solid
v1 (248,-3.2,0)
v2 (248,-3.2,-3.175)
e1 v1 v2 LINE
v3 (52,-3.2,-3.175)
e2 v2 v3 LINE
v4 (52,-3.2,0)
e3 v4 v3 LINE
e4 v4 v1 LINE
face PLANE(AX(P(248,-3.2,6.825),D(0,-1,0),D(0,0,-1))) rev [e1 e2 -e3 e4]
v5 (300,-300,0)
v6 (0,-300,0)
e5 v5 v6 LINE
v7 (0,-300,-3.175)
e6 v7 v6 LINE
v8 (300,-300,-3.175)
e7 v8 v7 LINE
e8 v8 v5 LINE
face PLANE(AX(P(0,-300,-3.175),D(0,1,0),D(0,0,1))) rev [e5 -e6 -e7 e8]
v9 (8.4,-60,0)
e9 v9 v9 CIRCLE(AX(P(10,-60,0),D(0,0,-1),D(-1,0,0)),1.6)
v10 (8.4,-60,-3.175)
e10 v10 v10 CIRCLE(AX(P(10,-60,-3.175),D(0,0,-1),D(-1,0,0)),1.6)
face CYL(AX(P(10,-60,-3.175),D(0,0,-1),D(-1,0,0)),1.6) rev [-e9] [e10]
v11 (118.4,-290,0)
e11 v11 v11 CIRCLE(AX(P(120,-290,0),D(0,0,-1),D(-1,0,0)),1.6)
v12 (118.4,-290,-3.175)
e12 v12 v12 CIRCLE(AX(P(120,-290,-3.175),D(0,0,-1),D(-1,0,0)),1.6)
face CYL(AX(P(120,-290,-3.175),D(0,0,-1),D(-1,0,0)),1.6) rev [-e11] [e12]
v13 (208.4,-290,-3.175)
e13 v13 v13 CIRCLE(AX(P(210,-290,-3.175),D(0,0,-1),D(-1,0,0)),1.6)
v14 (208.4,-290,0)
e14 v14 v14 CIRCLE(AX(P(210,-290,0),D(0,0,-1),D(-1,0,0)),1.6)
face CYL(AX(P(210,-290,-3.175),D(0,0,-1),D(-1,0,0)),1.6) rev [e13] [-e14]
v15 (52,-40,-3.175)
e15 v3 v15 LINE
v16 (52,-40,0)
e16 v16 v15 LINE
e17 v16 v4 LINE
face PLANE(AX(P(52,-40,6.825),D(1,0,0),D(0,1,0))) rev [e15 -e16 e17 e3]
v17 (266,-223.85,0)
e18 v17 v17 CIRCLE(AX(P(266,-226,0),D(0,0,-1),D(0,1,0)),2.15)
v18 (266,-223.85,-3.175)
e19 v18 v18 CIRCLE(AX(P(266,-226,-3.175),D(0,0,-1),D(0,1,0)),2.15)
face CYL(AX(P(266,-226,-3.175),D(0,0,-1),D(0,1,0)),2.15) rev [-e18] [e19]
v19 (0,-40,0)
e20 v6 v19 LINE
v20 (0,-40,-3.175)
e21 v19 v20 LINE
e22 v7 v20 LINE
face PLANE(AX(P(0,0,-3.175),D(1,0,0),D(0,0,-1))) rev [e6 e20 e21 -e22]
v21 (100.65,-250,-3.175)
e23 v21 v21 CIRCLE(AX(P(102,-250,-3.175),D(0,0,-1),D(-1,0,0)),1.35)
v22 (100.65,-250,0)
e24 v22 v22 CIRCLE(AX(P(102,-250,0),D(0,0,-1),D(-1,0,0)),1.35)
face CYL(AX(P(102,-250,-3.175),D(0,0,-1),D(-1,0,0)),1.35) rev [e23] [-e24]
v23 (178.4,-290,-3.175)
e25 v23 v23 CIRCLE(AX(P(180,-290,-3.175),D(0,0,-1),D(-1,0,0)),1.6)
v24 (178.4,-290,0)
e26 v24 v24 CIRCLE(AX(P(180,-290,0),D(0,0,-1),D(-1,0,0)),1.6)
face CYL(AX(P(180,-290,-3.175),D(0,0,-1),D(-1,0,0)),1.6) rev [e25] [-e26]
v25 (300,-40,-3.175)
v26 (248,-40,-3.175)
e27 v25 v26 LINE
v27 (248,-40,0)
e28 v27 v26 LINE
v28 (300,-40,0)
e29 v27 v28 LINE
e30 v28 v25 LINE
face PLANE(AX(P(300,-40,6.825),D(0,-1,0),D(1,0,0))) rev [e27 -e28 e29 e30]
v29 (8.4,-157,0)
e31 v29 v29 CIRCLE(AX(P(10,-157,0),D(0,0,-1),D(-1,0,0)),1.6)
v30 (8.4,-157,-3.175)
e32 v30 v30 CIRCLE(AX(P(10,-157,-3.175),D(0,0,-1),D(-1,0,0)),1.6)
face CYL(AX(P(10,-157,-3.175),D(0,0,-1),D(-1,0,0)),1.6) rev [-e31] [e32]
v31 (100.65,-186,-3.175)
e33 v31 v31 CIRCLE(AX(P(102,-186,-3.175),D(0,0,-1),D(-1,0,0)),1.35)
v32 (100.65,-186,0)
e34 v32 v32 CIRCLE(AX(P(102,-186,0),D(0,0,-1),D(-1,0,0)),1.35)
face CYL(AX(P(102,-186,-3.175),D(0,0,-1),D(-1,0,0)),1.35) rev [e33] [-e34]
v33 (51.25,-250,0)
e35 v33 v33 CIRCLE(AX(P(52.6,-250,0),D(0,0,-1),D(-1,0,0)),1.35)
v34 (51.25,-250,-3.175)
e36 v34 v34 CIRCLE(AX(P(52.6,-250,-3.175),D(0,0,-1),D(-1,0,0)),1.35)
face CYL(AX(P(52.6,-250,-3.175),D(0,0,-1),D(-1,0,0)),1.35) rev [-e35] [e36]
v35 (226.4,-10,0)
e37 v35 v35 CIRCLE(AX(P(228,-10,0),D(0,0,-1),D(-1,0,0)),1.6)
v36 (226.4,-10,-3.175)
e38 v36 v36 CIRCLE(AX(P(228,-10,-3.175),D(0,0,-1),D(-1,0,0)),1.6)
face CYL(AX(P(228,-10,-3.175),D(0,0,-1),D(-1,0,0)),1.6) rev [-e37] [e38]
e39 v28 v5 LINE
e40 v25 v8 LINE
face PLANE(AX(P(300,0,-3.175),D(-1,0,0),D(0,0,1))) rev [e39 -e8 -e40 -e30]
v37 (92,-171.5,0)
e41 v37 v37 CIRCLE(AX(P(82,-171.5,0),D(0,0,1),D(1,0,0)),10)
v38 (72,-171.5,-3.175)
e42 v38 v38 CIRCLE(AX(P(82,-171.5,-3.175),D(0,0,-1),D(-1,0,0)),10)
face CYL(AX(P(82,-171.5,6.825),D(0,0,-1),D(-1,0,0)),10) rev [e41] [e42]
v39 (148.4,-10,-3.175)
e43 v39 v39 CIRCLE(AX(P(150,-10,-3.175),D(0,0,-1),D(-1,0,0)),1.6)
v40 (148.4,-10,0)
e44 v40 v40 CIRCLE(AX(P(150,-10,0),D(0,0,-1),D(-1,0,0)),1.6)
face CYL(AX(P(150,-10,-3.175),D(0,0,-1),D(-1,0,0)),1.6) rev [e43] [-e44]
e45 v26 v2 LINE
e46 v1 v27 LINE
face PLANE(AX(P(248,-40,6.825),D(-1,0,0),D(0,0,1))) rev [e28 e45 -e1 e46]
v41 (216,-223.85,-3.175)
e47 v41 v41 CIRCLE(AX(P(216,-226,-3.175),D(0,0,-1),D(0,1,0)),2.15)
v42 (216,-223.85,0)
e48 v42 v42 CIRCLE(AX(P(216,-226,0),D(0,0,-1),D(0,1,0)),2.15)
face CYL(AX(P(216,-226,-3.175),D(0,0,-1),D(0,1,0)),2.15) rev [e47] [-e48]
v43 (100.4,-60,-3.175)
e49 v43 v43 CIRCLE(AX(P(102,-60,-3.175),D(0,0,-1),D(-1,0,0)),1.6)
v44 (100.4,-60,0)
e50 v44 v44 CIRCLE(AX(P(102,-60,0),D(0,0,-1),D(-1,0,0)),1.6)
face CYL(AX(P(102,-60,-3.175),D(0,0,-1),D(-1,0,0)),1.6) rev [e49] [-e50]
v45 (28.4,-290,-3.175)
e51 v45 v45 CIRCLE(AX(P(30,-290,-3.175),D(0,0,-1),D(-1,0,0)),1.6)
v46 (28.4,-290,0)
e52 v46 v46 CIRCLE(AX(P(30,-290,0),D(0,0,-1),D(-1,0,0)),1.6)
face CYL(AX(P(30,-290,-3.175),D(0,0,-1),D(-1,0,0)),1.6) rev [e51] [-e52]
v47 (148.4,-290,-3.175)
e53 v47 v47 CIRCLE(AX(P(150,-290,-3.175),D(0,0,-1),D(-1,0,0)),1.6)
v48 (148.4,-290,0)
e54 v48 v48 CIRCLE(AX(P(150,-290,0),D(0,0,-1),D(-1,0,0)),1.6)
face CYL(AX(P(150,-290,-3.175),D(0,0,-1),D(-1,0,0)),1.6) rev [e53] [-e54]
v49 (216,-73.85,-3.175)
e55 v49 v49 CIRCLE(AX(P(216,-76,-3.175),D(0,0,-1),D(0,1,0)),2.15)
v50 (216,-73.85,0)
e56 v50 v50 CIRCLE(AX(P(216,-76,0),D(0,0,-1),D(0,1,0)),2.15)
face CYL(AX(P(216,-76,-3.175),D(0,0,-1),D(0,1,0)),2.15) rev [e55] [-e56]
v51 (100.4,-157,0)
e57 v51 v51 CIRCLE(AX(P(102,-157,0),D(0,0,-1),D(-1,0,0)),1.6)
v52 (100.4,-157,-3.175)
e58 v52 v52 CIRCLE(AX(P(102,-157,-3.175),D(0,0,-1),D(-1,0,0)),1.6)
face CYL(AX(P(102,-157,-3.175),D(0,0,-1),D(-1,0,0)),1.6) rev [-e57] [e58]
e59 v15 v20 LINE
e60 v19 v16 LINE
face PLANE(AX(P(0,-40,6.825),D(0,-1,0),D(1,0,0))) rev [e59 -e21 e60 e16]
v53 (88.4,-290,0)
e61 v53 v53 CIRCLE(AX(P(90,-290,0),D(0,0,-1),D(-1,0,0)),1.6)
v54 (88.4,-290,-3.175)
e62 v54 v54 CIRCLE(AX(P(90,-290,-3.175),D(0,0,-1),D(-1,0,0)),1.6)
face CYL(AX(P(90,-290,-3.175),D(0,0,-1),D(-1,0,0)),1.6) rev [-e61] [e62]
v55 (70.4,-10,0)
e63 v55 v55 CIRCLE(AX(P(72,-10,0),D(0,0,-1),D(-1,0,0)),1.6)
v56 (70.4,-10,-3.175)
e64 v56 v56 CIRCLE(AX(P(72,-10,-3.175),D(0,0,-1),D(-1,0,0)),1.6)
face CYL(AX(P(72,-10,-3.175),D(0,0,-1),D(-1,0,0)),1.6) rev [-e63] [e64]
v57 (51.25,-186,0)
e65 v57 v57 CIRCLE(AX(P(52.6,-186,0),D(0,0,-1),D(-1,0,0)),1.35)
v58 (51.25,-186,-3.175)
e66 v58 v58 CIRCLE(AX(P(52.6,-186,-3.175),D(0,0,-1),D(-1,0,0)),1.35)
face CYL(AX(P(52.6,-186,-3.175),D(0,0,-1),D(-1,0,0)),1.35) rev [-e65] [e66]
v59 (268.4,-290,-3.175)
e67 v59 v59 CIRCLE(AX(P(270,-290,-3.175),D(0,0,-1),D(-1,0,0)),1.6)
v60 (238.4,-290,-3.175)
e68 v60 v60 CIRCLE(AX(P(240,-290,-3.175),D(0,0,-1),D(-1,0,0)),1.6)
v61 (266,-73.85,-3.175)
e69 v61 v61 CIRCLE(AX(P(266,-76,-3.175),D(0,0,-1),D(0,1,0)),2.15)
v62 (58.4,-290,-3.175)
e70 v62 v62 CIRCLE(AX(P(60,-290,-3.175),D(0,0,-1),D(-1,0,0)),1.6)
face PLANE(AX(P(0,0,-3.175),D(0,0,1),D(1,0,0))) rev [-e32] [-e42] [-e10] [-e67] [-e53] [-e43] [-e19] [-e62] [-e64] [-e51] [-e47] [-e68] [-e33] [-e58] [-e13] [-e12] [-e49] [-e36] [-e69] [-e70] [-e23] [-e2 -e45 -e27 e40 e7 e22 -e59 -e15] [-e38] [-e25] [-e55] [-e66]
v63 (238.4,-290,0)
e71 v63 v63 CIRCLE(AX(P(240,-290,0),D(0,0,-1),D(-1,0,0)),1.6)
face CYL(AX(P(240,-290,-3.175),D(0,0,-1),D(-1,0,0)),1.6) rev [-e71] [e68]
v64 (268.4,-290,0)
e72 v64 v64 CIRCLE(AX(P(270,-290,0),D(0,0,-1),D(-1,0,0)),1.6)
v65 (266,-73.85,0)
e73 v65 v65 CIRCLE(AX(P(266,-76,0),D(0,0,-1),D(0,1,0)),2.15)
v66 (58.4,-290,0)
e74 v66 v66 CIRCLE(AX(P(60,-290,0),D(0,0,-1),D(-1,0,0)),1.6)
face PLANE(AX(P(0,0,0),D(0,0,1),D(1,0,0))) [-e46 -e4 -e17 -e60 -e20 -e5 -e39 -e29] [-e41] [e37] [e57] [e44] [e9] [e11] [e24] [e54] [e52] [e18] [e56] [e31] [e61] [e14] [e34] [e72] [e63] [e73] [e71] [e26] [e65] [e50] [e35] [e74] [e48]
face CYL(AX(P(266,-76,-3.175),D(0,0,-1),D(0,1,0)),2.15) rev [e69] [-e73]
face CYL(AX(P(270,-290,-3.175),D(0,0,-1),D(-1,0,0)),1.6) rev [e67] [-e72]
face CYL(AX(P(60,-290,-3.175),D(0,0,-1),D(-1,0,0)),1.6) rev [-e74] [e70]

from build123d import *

# Parameters (mm, degrees)
SKETCH1_W                    = 300
SKETCH1_H                    = 300
BOSS_EXTRUDE1_DEPTH          = 3.175
SKETCH2_W                    = 52
SKETCH2_H                    = 40
CUT_EXTRUDE1_DEPTH           = 10
M4_START                     = -3.175
M4_CLEARANCE_HOLE1_OUTLINE_R = 2.15
M4_CLEARANCE_HOLE1_DEPTH     = 3.175
M3_CLEARANCE_HOLE2_D         = 3.2
M2_5_CLEARANCE_HOLE1_D       = 2.7
M3_CLEARANCE_HOLE3_D         = 3.2
M3_CLEARANCE_HOLE4_D         = 3.2
SKETCH14_R                   = 10
CUT_EXTRUDE2_DEPTH           = 10
SKETCH5_W                    = 196
SKETCH5_H                    = 3.2
CUT_EXTRUDE3_DEPTH           = 10


# Read off the part's stored shape, not the designer's step: M4 Clearance Hole1
with BuildPart() as part:
    # Sketch1 → Boss-Extrude1 (new body)
    with BuildSketch(Plane(origin=(0, 0, 0), x_dir=(1, 0, 0), z_dir=(0, 0, -1))):
        with Locations((150, 150)):
            Rectangle(SKETCH1_W, SKETCH1_H)
    extrude(amount=BOSS_EXTRUDE1_DEPTH)

    # Sketch2 → Cut-Extrude1 (cut)
    with BuildSketch(Plane(origin=(0, 0, -3.175), x_dir=(1, 0, 0), z_dir=(0, 0, -1))):
        with Locations((26, 20)):
            Rectangle(SKETCH2_W, SKETCH2_H)
        with Locations((274, 20)):
            Rectangle(SKETCH2_W, SKETCH2_H)
    extrude(amount=-CUT_EXTRUDE1_DEPTH, mode=Mode.SUBTRACT)

    # M4 Clearance Hole1 outline → M4 Clearance Hole1 (cut)
    with BuildSketch(Plane.XY.offset(M4_START)):
        with Locations((266, -226)):
            Circle(M4_CLEARANCE_HOLE1_OUTLINE_R)
        with Locations((216, -76)):
            Circle(M4_CLEARANCE_HOLE1_OUTLINE_R)
        with Locations((216, -226)):
            Circle(M4_CLEARANCE_HOLE1_OUTLINE_R)
        with Locations((266, -76)):
            Circle(M4_CLEARANCE_HOLE1_OUTLINE_R)
    extrude(amount=M4_CLEARANCE_HOLE1_DEPTH, mode=Mode.SUBTRACT)

    # M3 Clearance Hole2 (through all)
    with Locations(Plane(origin=(0, 0, -3.175), x_dir=(-1, 0, 0), z_dir=(0, 0, -1))):
        with Locations((-102, -60), (-10, -157), (-102, -157), (-10, -60)):
            Hole(M3_CLEARANCE_HOLE2_D / 2)

    # M2.5 Clearance Hole1 (through all)
    with Locations(Plane(origin=(0, 0, -3.175), x_dir=(-1, 0, 0), z_dir=(0, 0, -1))):
        with Locations((-102, -186), (-52.6, -250), (-102, -250), (-52.6, -186)):
            Hole(M2_5_CLEARANCE_HOLE1_D / 2)

    # M3 Clearance Hole3 (through all)
    with Locations(Plane(origin=(0, 0, -3.175), x_dir=(-1, 0, 0), z_dir=(0, 0, -1))):
        with Locations((-30, -290), (-270, -290), (-240, -290), (-210, -290), (-180, -290), (-150, -290), (-120, -290), (-90, -290), (-60, -290)):
            Hole(M3_CLEARANCE_HOLE3_D / 2)

    # M3 Clearance Hole4 (through all)
    with Locations(Plane(origin=(0, 0, -3.175), x_dir=(-1, 0, 0), z_dir=(0, 0, -1))):
        with Locations((-72, -10), (-228, -10), (-150, -10)):
            Hole(M3_CLEARANCE_HOLE4_D / 2)

    # Sketch14 → Cut-Extrude2 (cut)
    with BuildSketch(Plane(origin=(0, 0, -3.175), x_dir=(-1, 0, 0), z_dir=(0, 0, -1))):
        with Locations((-82, -171.5)):
            Circle(SKETCH14_R)
    extrude(amount=-CUT_EXTRUDE2_DEPTH, mode=Mode.SUBTRACT)

    # Sketch5 → Cut-Extrude3 (cut)
    with BuildSketch(Plane(origin=(0, 0, -3.175), x_dir=(-1, 0, 0), z_dir=(0, 0, -1))):
        with Locations((-150, -1.6)):
            Rectangle(SKETCH5_W, SKETCH5_H)
    extrude(amount=-CUT_EXTRUDE3_DEPTH, mode=Mode.SUBTRACT)


solid = part.part
